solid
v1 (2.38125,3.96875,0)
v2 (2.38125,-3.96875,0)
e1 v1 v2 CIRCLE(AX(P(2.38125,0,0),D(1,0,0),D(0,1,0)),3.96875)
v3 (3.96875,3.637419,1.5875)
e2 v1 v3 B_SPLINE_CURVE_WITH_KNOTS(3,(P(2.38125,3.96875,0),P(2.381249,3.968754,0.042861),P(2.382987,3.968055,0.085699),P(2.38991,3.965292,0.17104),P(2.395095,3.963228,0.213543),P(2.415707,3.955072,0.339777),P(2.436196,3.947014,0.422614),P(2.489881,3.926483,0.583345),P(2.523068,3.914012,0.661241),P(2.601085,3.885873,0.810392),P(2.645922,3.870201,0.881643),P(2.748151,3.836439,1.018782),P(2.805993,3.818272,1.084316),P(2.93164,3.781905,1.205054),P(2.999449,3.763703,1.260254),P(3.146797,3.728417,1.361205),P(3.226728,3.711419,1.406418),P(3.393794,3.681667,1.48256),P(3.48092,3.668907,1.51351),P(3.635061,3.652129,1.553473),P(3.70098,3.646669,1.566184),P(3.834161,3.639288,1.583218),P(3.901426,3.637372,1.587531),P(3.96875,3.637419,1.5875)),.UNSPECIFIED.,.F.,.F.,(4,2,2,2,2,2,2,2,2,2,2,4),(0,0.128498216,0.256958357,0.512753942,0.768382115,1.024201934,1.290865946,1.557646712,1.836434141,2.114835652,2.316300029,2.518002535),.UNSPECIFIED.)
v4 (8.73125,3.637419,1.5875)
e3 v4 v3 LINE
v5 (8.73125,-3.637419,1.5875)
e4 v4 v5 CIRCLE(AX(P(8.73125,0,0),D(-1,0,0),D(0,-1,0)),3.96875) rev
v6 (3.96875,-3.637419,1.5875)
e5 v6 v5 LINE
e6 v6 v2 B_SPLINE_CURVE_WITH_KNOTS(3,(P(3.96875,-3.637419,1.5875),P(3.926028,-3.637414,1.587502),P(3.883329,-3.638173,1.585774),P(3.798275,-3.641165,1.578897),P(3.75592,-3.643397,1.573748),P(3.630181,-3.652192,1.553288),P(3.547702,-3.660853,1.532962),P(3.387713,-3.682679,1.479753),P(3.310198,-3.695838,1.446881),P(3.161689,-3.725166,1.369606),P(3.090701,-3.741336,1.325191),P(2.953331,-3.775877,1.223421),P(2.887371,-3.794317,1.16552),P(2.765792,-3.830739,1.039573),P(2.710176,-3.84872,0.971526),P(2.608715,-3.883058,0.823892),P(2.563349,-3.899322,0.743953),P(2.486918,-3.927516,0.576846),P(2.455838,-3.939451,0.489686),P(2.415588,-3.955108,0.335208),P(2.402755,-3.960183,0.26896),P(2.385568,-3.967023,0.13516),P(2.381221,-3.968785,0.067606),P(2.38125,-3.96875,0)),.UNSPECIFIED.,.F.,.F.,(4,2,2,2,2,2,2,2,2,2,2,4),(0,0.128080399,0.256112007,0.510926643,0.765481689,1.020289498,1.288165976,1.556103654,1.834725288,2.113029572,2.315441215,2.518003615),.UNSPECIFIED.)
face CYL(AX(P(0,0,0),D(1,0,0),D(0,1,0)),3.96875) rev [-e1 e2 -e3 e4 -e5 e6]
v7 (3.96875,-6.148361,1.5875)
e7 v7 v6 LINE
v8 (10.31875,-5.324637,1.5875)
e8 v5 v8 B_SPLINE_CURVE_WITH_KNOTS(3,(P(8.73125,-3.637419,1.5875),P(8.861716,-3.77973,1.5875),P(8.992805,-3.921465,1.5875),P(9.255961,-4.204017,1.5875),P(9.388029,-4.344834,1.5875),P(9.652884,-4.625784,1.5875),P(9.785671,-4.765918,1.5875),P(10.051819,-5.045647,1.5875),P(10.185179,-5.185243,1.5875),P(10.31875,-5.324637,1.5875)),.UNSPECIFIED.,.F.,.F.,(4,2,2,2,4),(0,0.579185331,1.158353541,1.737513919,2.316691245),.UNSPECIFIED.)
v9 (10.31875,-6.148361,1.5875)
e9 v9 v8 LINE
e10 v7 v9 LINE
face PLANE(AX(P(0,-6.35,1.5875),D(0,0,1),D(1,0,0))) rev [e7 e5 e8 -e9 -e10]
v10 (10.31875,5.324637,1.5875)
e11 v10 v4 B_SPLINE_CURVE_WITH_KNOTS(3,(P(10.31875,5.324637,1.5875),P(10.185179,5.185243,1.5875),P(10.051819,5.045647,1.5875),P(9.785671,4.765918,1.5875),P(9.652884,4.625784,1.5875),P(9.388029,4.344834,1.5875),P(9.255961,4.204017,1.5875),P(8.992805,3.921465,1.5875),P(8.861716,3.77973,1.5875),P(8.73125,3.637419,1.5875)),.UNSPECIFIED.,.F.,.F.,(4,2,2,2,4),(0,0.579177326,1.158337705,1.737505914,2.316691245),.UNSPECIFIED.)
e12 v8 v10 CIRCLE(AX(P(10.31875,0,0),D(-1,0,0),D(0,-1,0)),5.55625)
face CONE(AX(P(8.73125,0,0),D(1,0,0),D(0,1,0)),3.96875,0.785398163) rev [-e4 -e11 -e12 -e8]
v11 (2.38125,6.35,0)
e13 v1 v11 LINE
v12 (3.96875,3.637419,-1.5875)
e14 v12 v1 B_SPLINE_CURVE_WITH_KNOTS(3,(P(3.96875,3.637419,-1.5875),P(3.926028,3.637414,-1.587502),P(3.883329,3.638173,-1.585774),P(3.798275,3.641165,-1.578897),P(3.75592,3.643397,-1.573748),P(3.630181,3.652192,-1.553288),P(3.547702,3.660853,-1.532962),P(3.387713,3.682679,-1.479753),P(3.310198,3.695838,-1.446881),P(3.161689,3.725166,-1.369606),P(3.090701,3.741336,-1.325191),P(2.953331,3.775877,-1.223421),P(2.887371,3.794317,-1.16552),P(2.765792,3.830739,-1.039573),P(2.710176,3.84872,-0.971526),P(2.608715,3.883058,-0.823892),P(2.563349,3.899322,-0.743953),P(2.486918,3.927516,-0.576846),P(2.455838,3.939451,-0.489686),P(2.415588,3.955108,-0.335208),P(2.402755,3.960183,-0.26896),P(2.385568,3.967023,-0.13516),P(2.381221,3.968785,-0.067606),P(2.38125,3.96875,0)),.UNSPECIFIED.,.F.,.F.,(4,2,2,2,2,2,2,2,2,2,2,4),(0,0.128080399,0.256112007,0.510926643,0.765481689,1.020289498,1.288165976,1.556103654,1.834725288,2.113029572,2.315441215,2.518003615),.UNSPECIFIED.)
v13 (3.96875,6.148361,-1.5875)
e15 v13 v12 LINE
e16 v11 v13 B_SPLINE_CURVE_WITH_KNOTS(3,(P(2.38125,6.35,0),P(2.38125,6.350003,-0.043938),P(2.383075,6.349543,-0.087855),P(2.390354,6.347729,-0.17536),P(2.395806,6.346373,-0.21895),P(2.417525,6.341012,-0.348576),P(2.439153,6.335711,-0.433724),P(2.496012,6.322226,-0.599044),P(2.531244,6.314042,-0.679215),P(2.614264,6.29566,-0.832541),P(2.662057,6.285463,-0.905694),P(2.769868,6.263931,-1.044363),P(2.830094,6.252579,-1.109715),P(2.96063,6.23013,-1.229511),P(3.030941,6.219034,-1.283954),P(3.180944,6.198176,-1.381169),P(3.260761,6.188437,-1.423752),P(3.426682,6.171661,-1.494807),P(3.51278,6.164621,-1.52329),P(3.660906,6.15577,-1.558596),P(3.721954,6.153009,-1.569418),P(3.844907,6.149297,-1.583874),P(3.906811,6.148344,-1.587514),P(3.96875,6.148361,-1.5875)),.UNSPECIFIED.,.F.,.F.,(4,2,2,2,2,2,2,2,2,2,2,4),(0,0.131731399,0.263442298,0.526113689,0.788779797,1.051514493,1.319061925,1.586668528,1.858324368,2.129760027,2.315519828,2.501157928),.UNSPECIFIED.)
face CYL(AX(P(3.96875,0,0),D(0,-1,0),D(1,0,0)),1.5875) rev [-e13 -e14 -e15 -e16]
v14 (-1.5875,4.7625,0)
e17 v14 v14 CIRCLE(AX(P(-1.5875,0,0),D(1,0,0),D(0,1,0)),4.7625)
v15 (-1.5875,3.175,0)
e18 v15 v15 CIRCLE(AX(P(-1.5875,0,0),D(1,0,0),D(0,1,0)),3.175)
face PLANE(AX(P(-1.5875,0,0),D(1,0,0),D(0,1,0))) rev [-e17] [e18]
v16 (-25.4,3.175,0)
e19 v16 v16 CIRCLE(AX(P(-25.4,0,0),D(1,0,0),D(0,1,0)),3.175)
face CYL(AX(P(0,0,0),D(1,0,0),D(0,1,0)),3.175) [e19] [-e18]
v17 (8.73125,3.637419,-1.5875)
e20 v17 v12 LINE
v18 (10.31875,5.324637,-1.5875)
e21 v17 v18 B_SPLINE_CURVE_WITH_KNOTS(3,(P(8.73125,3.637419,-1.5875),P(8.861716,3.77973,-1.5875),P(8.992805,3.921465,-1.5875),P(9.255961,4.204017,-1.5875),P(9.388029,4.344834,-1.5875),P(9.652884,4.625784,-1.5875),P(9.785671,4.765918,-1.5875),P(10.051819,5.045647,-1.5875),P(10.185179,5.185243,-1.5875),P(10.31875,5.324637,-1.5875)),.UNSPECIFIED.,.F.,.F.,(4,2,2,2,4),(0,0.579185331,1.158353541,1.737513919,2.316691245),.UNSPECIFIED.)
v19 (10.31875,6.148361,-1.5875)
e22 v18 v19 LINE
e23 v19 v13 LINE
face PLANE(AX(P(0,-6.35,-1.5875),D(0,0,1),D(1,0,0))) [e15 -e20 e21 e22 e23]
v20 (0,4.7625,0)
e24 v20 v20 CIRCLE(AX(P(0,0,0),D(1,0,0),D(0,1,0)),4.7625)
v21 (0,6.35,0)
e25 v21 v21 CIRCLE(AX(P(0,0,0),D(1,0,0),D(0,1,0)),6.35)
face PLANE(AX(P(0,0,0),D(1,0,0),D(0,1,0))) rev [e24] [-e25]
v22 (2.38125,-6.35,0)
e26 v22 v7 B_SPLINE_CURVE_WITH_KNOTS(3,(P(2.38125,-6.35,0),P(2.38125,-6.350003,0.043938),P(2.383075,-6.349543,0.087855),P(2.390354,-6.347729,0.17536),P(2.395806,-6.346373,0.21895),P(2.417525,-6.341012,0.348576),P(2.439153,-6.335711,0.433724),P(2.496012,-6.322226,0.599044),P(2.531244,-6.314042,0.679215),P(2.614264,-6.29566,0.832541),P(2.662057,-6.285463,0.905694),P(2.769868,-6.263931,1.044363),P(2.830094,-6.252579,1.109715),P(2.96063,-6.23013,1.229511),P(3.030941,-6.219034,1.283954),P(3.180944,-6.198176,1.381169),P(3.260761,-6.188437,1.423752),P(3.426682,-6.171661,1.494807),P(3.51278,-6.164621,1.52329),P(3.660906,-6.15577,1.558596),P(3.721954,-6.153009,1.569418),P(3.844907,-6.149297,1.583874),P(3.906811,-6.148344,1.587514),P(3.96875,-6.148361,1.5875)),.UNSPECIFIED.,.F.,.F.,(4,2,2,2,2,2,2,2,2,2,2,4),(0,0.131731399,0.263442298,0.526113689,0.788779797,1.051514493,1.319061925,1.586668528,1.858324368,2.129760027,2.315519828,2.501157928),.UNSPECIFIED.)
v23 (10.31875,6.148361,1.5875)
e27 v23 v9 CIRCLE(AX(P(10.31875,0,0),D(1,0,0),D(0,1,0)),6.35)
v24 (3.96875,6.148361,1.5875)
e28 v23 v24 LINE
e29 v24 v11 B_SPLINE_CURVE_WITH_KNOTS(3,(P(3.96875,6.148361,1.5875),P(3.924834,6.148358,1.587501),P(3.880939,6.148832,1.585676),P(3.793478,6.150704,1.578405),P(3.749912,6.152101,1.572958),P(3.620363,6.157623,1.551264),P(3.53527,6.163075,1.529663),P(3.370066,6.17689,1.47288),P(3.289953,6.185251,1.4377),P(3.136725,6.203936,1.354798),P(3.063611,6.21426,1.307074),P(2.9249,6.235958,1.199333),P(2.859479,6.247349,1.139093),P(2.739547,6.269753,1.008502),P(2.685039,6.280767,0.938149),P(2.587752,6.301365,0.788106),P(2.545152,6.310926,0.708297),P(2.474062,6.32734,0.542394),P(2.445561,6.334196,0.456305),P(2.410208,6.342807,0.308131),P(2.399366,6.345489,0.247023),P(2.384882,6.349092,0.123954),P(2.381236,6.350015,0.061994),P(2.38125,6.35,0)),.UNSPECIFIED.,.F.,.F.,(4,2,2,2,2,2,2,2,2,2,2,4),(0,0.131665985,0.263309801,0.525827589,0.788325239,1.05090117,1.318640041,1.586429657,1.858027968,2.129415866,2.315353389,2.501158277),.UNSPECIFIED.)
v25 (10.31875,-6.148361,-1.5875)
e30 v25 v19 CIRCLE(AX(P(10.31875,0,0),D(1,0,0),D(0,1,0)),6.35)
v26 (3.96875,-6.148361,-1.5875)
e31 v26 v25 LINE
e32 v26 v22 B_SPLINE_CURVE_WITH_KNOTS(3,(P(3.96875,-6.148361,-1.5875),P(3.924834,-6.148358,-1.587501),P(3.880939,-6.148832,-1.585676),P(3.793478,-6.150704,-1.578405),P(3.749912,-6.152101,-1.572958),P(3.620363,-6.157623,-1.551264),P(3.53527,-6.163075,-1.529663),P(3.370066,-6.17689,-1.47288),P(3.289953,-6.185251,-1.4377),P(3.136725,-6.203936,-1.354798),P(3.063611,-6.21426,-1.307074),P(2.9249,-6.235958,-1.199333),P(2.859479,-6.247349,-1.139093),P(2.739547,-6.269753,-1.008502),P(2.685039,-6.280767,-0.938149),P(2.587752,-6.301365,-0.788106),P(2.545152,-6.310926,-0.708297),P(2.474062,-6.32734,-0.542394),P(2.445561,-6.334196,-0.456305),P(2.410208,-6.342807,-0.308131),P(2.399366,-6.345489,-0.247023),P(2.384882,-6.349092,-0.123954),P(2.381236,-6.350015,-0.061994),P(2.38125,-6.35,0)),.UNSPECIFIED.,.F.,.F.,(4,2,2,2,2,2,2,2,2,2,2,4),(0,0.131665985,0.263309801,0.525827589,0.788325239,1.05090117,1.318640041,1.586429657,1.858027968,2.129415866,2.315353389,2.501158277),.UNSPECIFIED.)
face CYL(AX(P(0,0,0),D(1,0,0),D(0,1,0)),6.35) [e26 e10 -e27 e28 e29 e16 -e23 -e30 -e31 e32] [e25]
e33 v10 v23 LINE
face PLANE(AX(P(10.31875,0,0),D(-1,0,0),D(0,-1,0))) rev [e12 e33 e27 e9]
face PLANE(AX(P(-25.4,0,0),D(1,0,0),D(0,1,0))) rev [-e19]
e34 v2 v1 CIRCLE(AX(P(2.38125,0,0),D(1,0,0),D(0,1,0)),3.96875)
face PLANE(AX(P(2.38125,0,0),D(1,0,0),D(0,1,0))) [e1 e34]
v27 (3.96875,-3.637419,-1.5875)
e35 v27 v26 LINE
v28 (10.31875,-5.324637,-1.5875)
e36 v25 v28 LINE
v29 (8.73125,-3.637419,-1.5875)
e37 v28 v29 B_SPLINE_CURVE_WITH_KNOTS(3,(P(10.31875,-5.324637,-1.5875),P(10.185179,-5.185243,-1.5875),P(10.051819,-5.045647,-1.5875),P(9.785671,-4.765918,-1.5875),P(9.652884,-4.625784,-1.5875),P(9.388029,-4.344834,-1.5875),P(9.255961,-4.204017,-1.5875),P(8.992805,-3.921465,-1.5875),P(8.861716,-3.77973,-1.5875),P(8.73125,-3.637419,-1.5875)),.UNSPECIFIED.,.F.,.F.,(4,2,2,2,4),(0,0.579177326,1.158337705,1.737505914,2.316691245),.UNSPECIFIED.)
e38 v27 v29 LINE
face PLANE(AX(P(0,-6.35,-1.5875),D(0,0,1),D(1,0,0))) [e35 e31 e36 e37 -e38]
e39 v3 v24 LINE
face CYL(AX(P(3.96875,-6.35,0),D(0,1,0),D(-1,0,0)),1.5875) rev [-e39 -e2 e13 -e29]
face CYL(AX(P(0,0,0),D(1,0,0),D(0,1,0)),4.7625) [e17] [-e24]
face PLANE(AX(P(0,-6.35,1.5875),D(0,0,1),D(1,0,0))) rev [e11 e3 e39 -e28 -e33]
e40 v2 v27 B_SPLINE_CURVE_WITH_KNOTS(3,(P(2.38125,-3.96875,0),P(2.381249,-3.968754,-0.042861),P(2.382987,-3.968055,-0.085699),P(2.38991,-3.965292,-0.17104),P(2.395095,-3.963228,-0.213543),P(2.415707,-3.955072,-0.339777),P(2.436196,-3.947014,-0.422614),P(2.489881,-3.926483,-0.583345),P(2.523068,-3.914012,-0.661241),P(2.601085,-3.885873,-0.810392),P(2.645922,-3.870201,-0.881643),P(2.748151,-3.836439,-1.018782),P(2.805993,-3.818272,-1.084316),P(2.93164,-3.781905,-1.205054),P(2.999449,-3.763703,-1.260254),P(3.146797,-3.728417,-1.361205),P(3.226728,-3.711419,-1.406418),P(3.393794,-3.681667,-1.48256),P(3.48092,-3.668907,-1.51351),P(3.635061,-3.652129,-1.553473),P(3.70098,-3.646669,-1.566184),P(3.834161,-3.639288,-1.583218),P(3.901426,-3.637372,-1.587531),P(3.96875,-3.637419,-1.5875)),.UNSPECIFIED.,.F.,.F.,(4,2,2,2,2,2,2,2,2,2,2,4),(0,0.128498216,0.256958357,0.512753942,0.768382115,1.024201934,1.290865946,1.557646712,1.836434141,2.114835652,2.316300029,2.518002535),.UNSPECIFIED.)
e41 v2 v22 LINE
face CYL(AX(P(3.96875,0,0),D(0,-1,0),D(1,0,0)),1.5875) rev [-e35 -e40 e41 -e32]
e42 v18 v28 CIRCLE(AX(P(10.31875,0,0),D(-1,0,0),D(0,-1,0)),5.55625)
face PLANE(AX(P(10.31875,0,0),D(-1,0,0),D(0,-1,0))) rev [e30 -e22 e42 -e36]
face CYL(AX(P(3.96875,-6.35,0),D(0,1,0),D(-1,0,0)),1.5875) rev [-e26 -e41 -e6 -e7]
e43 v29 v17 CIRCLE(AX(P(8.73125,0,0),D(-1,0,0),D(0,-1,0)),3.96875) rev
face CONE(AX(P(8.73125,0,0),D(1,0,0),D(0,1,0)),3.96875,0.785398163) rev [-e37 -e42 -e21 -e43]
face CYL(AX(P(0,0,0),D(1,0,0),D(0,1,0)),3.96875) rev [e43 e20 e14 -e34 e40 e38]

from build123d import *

# Parameters (mm, degrees)
SKETCH1_W               = 25.4
SKETCH1_H               = 3.175
SKETCH1_W_2             = 1.5875
SKETCH1_H_2             = 1.5875
SKETCH1_W_3             = 7.9375
SKETCH1_H_3             = 2.38125
CUT_EXTRUDE1_DEPTH      = 27.940768363
CUT_EXTRUDE1_DEPTH_BACK = 27.940768363
SKETCH2_W               = 0.79375
SKETCH2_H               = 3.175
SKETCH2_R               = 1.5875
FILLET1_R               = 1.5875
CHAMFER1_SIZE           = 1.5875


with BuildPart() as part:
    # Sketch1 → Revolve1 (revolve)
    with BuildSketch(Plane.XY):
        with Locations((-12.7, 1.5875)):
            Rectangle(SKETCH1_W, SKETCH1_H)
        with Locations((-0.79375, 3.96875)):
            Rectangle(SKETCH1_W_2, SKETCH1_H_2)
        Polygon((0, 3.175), (0, 0), (2.38125, 0), (2.38125, 3.96875), (2.38125, 6.35), (0, 6.35), (0, 4.7625), align=None)
        with Locations((6.35, 5.159375)):
            Rectangle(SKETCH1_W_3, SKETCH1_H_3)
    revolve(axis=Axis((0, 0, 0), (-1, 0, 0)))

    # Sketch2 → Cut-Extrude1 (cut, two sides: drawn at the far end of the back side and taken through both)
    with BuildSketch(Plane(origin=(0, 0, 0), x_dir=(1, 0, 0), z_dir=(0, 1, 0)).offset(-CUT_EXTRUDE1_DEPTH_BACK)):
        with Locations((2.778125, 0)):
            Rectangle(SKETCH2_W, SKETCH2_H)
        with BuildLine():
            Line((3.175, -1.5875), (6.35, -1.5875))
            ThreePointArc((6.35, -1.5875), (4.7625, 0), (6.35, 1.5875))
            Line((6.35, 1.5875), (3.175, 1.5875))
            Line((3.175, 1.5875), (3.175, -1.5875))
        make_face()
        with Locations((6.35, 0)):
            Circle(SKETCH2_R)
        with BuildLine():
            Line((6.35, -1.5875), (10.31875, -1.5875))
            Line((10.31875, -1.5875), (10.31875, 1.5875))
            Line((10.31875, 1.5875), (6.35, 1.5875))
            ThreePointArc((6.35, 1.5875), (7.472532015, 1.122532015), (7.9375, 0))
            ThreePointArc((7.9375, 0), (7.472532015, -1.122532015), (6.35, -1.5875))
        make_face()
    extrude(amount=CUT_EXTRUDE1_DEPTH + CUT_EXTRUDE1_DEPTH_BACK, mode=Mode.SUBTRACT)

    # Fillet1
    fillet1_edges = [part.edges().sort_by_distance(p)[0] for p in [
        (2.38125, -4.89289026, -1.5875),
        (2.38125, 4.89289026, -1.5875),
        (2.38125, -4.89289026, 1.5875),
        (2.38125, 4.89289026, 1.5875),
    ]]
    fillet(fillet1_edges, radius=FILLET1_R - 0.0001)  # a hair under: the kernel refuses the full size

    # Chamfer1
    chamfer1_edges = [part.edges().sort_by_distance(p)[0] for p in [
        (10.31875, 0, 3.96875),
        (10.31875, 0, -3.96875),
    ]]
    chamfer(chamfer1_edges, length=CHAMFER1_SIZE)


solid = part.part
